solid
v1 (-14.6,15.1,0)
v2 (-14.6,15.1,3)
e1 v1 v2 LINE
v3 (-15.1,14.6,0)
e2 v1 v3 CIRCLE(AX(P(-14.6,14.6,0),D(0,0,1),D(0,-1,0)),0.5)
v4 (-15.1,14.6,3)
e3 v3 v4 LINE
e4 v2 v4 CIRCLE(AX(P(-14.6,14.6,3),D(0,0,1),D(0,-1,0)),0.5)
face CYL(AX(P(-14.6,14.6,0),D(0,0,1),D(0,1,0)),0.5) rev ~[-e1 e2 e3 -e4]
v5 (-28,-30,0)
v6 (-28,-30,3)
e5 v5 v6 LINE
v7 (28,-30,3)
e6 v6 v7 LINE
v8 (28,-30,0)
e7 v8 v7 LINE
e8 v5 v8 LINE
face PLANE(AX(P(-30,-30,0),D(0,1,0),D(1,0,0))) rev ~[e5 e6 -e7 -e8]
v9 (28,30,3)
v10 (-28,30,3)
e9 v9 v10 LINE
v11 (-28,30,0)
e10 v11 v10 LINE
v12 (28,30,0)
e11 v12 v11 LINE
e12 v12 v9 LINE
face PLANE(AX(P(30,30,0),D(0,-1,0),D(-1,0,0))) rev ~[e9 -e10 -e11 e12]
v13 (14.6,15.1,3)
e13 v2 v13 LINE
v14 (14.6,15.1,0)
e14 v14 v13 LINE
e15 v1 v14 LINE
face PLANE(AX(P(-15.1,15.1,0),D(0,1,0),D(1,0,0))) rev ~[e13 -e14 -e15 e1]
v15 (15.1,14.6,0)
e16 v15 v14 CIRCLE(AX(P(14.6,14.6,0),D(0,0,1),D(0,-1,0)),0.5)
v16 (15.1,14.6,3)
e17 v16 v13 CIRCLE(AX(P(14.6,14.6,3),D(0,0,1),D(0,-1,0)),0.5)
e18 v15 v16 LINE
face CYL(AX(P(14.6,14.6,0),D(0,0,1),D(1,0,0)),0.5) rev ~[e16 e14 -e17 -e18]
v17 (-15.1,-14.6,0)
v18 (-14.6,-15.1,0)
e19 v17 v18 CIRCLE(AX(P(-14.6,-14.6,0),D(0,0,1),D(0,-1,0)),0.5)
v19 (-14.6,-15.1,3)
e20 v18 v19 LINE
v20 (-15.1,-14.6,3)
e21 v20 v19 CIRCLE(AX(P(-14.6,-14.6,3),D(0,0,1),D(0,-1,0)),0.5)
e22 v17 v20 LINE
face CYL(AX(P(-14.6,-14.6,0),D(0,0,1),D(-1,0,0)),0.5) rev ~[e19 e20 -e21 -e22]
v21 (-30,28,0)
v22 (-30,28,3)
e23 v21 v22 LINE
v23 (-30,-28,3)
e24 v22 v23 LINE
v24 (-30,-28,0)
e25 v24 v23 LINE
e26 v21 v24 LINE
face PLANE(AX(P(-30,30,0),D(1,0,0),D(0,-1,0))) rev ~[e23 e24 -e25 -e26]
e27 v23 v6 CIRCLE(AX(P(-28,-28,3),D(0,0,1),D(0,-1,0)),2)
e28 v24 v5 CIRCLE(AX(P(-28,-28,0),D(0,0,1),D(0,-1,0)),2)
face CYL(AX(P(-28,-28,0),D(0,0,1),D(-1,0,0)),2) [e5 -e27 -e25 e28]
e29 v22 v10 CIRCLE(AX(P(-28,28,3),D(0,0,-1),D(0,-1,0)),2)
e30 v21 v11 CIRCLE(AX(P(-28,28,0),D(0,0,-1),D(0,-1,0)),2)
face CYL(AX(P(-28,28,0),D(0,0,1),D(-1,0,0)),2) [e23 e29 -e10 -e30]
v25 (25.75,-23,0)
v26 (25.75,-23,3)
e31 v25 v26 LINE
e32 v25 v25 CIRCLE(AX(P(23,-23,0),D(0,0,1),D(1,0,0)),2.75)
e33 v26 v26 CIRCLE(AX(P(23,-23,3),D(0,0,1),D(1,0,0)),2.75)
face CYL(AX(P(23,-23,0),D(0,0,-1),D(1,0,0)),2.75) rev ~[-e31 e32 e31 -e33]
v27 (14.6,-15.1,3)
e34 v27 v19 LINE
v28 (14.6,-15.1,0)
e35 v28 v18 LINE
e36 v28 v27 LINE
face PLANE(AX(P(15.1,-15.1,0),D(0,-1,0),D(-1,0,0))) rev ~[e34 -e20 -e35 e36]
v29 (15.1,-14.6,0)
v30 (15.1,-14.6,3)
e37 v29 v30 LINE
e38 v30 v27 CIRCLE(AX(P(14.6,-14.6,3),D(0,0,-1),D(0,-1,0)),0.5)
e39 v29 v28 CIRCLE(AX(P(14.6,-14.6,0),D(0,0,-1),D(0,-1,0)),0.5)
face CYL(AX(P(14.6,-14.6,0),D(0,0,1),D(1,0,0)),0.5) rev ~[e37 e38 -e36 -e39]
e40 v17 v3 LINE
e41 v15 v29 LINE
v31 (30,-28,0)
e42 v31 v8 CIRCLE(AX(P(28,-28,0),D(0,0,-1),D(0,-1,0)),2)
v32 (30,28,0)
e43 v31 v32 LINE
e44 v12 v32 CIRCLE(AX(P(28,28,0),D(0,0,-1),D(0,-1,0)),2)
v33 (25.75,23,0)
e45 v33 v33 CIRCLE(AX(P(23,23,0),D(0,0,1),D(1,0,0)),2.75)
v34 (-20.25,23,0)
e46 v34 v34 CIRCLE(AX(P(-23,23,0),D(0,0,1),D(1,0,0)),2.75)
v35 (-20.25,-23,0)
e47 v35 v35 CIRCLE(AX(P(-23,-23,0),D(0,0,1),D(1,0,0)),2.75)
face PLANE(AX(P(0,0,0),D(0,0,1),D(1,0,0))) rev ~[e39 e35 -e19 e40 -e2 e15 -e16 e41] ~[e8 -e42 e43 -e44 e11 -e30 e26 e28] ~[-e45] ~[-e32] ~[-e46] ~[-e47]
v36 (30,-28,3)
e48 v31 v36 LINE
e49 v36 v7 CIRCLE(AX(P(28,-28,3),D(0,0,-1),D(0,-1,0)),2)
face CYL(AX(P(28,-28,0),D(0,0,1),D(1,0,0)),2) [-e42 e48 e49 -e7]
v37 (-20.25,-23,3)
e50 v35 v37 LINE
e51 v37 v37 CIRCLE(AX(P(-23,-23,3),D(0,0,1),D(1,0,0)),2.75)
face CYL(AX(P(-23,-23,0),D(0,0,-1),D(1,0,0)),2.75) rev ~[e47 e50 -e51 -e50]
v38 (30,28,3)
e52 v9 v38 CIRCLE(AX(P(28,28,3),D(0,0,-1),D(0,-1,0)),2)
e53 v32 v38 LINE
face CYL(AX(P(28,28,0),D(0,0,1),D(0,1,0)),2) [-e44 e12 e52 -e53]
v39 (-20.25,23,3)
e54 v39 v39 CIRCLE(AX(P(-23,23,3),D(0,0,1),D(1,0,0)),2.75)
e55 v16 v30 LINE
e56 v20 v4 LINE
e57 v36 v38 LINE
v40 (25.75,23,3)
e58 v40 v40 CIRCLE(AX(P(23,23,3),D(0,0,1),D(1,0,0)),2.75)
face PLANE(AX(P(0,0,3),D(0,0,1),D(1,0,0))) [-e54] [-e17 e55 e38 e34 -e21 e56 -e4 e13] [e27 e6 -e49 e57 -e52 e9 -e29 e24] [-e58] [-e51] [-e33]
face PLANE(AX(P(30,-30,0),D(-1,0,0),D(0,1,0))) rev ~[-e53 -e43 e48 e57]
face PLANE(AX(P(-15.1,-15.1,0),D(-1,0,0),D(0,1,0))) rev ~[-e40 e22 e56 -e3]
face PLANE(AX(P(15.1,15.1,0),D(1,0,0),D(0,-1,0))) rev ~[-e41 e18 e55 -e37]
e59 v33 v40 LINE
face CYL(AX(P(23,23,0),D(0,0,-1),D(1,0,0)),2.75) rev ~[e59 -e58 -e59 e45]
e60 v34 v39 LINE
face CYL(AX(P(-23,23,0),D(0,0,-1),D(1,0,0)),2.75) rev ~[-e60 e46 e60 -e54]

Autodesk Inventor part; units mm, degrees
ref_plane "YZ Plane" through (0, 0, 0) normal (1, 0, 0) x (0, 1, 0)
ref_plane "XZ Plane" through (0, 0, 0) normal (0, 1, 0) x (-1, 0, 0)
ref_plane "XY Plane" through (0, 0, 0) normal (0, 0, 1) x (1, 0, 0)
sketch "Sketch1" plane through (0, 0, 0) normal (0, 0, 1) x (1, 0, 0)
  line L0 (-30, -30) -> (30, -30)
  line L1 (30, -30) -> (30, 30)
  line L2 (30, 30) -> (-30, 30)
  line L3 (-30, 30) -> (-30, -30)
  line L4 (-30, -30) -> (30, 30) construction
  line L5 (30, -30) -> (-30, 30) construction
  line L6 (15.1, -15.1) -> (-15.1, -15.1)
  line L7 (-15.1, -15.1) -> (-15.1, 15.1)
  line L8 (-15.1, 15.1) -> (15.1, 15.1)
  line L9 (15.1, 15.1) -> (15.1, -15.1)
  line L10 (15.1, -15.1) -> (-15.1, 15.1) construction
  line L11 (-15.1, -15.1) -> (15.1, 15.1) construction
  circle A0 centre (-23, -23) radius 2.75
  circle A1 centre (23, -23) radius 2.75
  circle A2 centre (23, 23) radius 2.75
  circle A3 centre (-23, 23) radius 2.75
  line L12 (25.75, 25.75) -> (-25.75, 25.75) construction
  line L13 (-25.75, 25.75) -> (-25.75, -25.75) construction
  line L14 (-25.75, -25.75) -> (25.75, -25.75) construction
  line L15 (25.75, -25.75) -> (25.75, 25.75) construction
  line L16 (25.75, 25.75) -> (-25.75, -25.75) construction
  line L17 (-25.75, 25.75) -> (25.75, -25.75) construction
  line L18 (23, 23) -> (-23, 23) construction
  line L19 (-23, 23) -> (-23, -23) construction
  line L20 (-23, -23) -> (23, -23) construction
  line L21 (23, -23) -> (23, 23) construction
  line L22 (23, 23) -> (-23, -23) construction
  line L23 (-23, 23) -> (23, -23) construction
  point P0 (0, 0)
  dimension "d172" = 30.2
  dimension "d190" = 5.5
  dimension "d191" = 46
  dimension "d192" = 60
extrude "Plate5" add sketch "Sketch1" along normal blind 3
fillet "Corner Round1" radius 2 4 edges at (30, 30, 1.5) (-30, 30, 1.5) (-30, -30, 1.5) (30, -30, 1.5)
fillet "Corner Round2" radius 0.5 4 edges at (-15.1, 15.1, 1.5) (-15.1, -15.1, 1.5) (15.1, -15.1, 1.5) (15.1, 15.1, 1.5)
properties part number "PRS 1425 DrSysB Way FLANGE_1200" material "Stainless Steel"
